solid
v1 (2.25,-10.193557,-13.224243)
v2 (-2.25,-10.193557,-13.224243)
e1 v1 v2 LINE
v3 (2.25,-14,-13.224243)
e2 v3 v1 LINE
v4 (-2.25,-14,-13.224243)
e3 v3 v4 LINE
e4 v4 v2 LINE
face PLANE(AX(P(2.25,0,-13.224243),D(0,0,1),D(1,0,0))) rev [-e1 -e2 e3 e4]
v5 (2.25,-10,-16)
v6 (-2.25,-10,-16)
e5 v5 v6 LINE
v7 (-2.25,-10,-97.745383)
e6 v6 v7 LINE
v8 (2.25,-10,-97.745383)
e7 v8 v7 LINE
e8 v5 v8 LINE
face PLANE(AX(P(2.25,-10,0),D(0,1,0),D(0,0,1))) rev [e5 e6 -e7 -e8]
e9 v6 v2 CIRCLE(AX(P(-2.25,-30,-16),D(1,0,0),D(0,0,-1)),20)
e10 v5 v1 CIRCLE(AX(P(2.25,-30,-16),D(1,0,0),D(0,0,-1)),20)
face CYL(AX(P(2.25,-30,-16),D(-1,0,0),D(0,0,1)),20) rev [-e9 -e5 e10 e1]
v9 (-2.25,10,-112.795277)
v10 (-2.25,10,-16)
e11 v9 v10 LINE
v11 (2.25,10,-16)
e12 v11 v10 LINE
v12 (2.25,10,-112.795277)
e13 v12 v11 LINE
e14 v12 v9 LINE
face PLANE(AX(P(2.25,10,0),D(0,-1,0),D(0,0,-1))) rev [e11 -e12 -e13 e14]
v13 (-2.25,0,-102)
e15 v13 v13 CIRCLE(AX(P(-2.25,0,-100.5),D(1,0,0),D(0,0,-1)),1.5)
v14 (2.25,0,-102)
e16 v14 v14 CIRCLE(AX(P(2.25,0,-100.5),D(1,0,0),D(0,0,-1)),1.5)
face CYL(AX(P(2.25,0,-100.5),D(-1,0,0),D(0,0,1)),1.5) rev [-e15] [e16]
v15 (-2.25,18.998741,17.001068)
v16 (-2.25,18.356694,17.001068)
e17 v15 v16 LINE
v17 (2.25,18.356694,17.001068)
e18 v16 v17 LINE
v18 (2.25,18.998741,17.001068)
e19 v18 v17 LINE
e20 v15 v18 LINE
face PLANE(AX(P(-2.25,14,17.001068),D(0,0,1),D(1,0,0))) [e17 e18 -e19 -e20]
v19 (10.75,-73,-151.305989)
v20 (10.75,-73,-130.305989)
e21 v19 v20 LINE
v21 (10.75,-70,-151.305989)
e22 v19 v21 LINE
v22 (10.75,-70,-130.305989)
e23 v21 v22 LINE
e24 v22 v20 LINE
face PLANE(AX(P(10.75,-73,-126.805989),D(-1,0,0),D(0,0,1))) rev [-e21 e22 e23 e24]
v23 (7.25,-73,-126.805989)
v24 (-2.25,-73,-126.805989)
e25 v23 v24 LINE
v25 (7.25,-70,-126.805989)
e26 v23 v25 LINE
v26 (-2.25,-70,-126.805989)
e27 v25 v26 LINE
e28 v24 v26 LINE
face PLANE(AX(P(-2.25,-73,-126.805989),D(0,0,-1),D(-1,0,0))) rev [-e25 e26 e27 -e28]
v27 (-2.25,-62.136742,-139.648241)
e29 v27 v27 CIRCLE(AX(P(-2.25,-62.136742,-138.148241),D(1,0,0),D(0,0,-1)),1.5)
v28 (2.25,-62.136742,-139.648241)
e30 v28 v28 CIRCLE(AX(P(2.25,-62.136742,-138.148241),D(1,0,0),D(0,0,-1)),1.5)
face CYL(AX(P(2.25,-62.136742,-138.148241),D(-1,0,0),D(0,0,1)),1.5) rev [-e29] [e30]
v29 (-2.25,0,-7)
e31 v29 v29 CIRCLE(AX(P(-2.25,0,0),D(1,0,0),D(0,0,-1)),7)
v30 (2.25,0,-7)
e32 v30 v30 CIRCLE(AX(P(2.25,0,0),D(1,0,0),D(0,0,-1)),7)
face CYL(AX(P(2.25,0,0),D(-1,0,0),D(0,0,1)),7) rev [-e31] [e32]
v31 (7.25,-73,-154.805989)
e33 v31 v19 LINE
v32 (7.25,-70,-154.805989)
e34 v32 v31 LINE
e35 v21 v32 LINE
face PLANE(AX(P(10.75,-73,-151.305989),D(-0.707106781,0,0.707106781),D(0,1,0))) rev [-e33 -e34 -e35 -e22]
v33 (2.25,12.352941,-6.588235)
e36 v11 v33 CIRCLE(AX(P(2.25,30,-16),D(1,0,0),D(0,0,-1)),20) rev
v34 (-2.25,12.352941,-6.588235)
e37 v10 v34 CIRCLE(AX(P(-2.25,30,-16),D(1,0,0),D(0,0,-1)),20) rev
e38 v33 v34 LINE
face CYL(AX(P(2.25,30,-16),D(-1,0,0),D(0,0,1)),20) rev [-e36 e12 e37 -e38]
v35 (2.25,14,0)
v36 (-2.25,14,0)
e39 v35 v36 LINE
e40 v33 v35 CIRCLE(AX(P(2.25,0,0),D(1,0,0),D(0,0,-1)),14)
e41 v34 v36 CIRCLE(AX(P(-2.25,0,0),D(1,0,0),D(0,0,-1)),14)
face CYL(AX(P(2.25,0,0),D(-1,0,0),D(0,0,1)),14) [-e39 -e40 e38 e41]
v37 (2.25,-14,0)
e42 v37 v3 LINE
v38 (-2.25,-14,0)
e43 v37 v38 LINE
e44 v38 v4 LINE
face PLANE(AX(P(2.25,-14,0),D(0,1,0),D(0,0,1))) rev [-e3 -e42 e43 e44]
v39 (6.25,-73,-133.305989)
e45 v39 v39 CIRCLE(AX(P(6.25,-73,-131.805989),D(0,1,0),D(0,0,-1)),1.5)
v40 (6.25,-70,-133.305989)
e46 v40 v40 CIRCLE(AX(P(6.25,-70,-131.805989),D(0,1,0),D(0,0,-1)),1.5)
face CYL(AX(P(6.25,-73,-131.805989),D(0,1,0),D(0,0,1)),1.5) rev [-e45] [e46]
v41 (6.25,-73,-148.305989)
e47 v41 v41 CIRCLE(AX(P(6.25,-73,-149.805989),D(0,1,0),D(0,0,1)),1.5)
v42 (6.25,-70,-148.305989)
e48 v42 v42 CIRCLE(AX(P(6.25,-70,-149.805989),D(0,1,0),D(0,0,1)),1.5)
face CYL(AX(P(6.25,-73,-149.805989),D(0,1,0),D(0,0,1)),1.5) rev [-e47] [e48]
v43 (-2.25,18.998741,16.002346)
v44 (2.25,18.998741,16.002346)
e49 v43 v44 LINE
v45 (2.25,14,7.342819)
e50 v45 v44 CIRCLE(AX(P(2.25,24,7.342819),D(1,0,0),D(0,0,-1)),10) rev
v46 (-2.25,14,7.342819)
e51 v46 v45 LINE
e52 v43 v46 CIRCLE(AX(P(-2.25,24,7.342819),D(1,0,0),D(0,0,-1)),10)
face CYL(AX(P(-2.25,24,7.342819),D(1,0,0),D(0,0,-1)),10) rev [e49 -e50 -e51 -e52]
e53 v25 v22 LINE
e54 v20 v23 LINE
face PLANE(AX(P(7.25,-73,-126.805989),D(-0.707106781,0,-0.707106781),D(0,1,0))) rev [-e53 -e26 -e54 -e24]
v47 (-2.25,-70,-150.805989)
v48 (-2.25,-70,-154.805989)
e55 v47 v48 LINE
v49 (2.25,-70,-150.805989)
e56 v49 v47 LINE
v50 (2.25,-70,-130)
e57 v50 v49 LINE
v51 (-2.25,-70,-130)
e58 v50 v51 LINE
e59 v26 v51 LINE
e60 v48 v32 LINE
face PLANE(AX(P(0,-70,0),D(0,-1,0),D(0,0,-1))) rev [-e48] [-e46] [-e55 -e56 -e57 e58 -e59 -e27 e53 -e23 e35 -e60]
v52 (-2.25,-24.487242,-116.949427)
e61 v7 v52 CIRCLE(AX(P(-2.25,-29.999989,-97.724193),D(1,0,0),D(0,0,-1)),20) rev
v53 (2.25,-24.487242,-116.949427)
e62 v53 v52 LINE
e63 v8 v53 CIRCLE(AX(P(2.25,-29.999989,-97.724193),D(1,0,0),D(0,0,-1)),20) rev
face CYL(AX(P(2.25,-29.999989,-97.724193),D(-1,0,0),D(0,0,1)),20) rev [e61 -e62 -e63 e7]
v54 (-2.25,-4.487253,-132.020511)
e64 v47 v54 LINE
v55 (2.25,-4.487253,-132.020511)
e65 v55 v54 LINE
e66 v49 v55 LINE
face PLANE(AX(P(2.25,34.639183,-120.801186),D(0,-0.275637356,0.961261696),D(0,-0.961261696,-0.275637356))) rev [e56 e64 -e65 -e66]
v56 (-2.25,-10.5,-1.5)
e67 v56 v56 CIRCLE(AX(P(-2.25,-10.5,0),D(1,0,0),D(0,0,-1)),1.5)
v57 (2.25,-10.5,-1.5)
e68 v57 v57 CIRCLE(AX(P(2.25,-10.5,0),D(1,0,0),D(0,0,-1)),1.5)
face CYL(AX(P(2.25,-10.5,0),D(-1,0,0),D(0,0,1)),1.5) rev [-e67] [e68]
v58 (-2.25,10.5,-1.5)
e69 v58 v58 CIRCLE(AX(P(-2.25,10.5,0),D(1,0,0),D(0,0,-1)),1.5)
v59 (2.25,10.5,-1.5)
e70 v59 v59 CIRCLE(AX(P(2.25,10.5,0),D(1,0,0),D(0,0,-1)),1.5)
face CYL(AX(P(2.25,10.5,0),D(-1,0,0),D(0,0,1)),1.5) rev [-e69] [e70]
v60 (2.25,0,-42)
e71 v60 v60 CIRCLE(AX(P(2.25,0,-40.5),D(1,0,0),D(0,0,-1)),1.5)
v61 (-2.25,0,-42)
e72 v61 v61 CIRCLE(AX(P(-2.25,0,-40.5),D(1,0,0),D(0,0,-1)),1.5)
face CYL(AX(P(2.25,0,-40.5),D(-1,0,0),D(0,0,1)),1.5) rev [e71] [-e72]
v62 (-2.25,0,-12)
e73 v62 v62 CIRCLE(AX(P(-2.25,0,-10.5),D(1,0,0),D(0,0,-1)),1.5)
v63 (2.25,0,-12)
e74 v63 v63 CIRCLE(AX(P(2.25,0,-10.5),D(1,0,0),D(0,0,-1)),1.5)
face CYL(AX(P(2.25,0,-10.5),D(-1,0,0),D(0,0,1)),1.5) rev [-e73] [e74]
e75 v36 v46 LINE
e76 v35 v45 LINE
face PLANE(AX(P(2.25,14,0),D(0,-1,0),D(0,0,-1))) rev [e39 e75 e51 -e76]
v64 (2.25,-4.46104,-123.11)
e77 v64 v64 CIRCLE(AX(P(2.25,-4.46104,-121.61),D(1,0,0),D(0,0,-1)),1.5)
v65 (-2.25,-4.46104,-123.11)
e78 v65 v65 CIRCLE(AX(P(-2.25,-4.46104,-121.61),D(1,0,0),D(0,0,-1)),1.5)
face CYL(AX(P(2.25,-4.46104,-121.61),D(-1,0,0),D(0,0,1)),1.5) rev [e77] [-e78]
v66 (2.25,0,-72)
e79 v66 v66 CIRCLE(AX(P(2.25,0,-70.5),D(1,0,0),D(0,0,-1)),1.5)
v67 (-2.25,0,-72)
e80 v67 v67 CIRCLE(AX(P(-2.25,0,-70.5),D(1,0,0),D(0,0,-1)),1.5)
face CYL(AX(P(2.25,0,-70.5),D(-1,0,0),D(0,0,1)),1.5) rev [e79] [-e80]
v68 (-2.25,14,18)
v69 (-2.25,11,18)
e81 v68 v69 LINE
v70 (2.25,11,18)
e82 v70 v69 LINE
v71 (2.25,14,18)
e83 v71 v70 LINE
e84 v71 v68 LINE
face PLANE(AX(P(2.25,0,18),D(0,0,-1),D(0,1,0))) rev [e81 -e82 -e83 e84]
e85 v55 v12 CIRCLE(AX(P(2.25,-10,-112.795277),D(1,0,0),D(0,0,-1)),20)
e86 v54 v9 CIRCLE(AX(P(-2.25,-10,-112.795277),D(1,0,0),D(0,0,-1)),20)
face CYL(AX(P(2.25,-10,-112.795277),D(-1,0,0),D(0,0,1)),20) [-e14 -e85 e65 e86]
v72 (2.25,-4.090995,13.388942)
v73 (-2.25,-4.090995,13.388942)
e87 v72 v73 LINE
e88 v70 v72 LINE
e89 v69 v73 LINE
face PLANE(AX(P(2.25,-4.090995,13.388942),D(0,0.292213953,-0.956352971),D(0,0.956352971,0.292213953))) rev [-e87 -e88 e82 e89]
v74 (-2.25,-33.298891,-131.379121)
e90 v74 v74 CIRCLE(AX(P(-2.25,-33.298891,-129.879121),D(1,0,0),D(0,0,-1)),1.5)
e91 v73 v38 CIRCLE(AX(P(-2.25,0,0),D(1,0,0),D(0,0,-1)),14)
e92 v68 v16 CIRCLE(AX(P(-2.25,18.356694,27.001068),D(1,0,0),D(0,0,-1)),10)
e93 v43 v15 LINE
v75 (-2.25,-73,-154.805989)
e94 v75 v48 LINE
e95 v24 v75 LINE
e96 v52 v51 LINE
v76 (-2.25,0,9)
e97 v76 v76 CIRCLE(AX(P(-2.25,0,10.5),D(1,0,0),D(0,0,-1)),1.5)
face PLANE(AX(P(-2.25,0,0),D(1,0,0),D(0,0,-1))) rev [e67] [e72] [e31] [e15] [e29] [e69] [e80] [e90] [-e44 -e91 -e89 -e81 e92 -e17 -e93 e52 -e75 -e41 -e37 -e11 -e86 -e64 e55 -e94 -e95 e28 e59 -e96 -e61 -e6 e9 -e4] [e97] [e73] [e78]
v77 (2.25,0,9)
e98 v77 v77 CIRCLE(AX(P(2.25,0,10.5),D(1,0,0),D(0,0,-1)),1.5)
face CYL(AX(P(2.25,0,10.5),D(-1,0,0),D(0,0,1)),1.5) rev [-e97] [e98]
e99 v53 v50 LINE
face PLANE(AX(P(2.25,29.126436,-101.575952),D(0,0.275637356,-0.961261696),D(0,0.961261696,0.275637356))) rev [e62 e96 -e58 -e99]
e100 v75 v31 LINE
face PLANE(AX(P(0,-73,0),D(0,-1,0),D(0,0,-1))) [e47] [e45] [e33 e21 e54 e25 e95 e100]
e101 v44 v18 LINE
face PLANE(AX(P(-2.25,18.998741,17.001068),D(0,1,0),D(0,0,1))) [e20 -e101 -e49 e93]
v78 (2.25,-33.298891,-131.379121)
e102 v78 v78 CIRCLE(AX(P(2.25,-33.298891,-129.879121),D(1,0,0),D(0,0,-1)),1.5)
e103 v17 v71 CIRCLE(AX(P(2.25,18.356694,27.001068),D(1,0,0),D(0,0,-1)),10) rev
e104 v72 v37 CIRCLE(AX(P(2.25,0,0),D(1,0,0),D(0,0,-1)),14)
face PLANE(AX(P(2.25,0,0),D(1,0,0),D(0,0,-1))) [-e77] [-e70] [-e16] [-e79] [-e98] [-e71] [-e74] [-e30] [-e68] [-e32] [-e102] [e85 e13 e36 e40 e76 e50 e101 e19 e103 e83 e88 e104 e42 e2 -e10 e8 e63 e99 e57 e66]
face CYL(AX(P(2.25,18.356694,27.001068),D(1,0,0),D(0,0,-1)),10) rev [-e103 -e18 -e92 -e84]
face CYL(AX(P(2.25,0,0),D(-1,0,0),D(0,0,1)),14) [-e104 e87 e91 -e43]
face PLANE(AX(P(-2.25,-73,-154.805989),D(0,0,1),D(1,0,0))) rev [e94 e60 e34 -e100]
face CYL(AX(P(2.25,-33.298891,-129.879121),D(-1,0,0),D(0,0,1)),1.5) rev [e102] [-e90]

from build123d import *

# Parameters (mm, degrees)
SKETCH_1_R          = 1.5
SKETCH_1_R_2        = 7
EXTRUDE_1_DEPTH     = 2.25
SKETCH_5_W          = 13
SKETCH_5_H          = 28
EXTRUDE_3_DEPTH     = 3
SKETCH_6_R          = 1.5
CUT_EXTRUDE_2_DEPTH = 177.455253939
SKETCH_7_W          = 0.998721622
SKETCH_7_H          = 4.998741363
EXTRUDE_4_DEPTH     = 4.5
FILLET_1_R          = 10
CHAMFER_1_SIZE      = 3.5


with BuildPart() as part:
    # 草图1 → 凸台-拉伸1 (new, symmetric)
    with BuildSketch(Plane(origin=(0, 0, 0), x_dir=(0, 0, -1), z_dir=(1, 0, 0))):
        with BuildLine():
            ThreePointArc((97.745383074, -10), (109.768953128, -14.033657178), (116.949426552, -24.487241658))
            Line((116.949426552, -24.487241658), (130, -70))
            Line((130, -70), (150.805988717, -70))
            Line((150.805988717, -70), (132.020510773, -4.487252884))
            ThreePointArc((132.020510773, -4.487252884), (124.831577318, 5.972710201), (112.795276854, 10))
            Line((112.795276854, 10), (16, 10))
            ThreePointArc((16, 10), (11.149287499, 10.597149997), (6.588235294, 12.352941176))
            ThreePointArc((6.588235294, 12.352941176), (3.395498751, 13.581995002), (0, 14))
            Line((0, 14), (-18, 14))
            Line((-18, 14), (-18, 11))
            Line((-18, 11), (-13.388941598, -4.090995342))
            ThreePointArc((-13.388941598, -4.090995342), (-8.328447191, -11.253309175), (0, -14))
            Line((0, -14), (13.224243357, -14))
            Line((13.224243357, -14), (13.224243357, -10.193557234))
            ThreePointArc((13.224243357, -10.193557234), (14.608751519, -10.048447989), (16, -10))
            Line((16, -10), (97.745383074, -10))
        make_face()
        with Locations((138.148241349, -62.136741787)):
            Circle(SKETCH_1_R, mode=Mode.SUBTRACT)
        with Locations((129.879120675, -33.298890909)):
            Circle(SKETCH_1_R, mode=Mode.SUBTRACT)
        with Locations((0, -10.5)):
            Circle(SKETCH_1_R, mode=Mode.SUBTRACT)
        with Locations((-10.5, 0)):
            Circle(SKETCH_1_R, mode=Mode.SUBTRACT)
        Circle(SKETCH_1_R_2, mode=Mode.SUBTRACT)
        with Locations((10.5, 0)):
            Circle(SKETCH_1_R, mode=Mode.SUBTRACT)
        with Locations((0, 10.5)):
            Circle(SKETCH_1_R, mode=Mode.SUBTRACT)
        with Locations((40.5, 0)):
            Circle(SKETCH_1_R, mode=Mode.SUBTRACT)
        with Locations((70.5, 0)):
            Circle(SKETCH_1_R, mode=Mode.SUBTRACT)
        with Locations((100.5, 0)):
            Circle(SKETCH_1_R, mode=Mode.SUBTRACT)
        with Locations((121.61, -4.461040031)):
            Circle(SKETCH_1_R, mode=Mode.SUBTRACT)
    extrude(amount=EXTRUDE_1_DEPTH, both=True)

    # 草图5 → 凸台-拉伸3 (add)
    with BuildSketch(Plane.XZ.offset(70)):
        with Locations((4.25, -140.805988717)):
            Rectangle(SKETCH_5_W, SKETCH_5_H)
    extrude(amount=EXTRUDE_3_DEPTH)

    # 草图6 → 切除-拉伸2 (cut, through all)
    with BuildSketch(Plane(origin=(0, -70, 0), x_dir=(1, 0, 0), z_dir=(0, 1, 0))):
        with Locations(Location((6.25, 149.805988717, 0), (0, 0, 270))):
            Circle(SKETCH_6_R)
        with Locations(Location((6.25, 131.805988717, 0), (0, 0, 90))):
            Circle(SKETCH_6_R)
    extrude(amount=-CUT_EXTRUDE_2_DEPTH, mode=Mode.SUBTRACT)

    # 草图7 → 凸台-拉伸4 (add)
    with BuildSketch(Plane(origin=(2.25, 0, 0), x_dir=(0, 0, -1), z_dir=(1, 0, 0))):
        with Locations((-16.501706932, 16.499370682)):
            Rectangle(SKETCH_7_W, SKETCH_7_H)
    extrude(amount=-EXTRUDE_4_DEPTH)

    # 圆角1
    # the kernel refuses this fillet: 10 mm, written as the material it adds along each edge
    with BuildSketch(Plane(origin=(2.25, 14, 16.002346121), x_dir=(0, 0, -1), z_dir=(-1, 0, 0))) as fillet_1_piece_1:
        with BuildLine():
            CenterArc((8.659527241, -10), FILLET_1_R, 90, 59.991672573)
            Line((0, -4.998741363), (-0.173190545, -4.89871619))
            ThreePointArc((-0.173190545, -4.89871619), (-0.2, -2.499370681), (-0.2, 0))
            Line((-0.2, 0), (0, 0.2))
            Line((0, 0.2), (8.659527241, 0.2))
            Line((8.659527241, 0.2), (8.659527241, 0))
        make_face()
    extrude(amount=4.5)
    with BuildSketch(Plane(origin=(2.25, 14, 17.001067743), x_dir=(0, 0, 1), z_dir=(-1, 0, 0))) as fillet_1_piece_2:
        with BuildLine():
            CenterArc((10, 4.356693642), FILLET_1_R, 180, 25.82789421)
            Line((0, 4.356693642), (-0.2, 4.356693642))
            Line((-0.2, 4.356693642), (-0.2, 0))
            Line((-0.2, 0), (0, -0.2))
            ThreePointArc((0, -0.2), (0.499466129, -0.2), (0.818910902, -0.087133873))
            Line((0.818910902, -0.087133873), (0.998932257, 0))
        make_face()
    extrude(amount=4.5)

    # 倒角1
    chamfer_1_edges = [part.edges().sort_by_distance(p)[0] for p in [
        (10.75, -71.5, -154.805988717),
        (10.75, -71.5, -126.805988717),
    ]]
    chamfer(chamfer_1_edges, length=CHAMFER_1_SIZE)


solid = part.part
